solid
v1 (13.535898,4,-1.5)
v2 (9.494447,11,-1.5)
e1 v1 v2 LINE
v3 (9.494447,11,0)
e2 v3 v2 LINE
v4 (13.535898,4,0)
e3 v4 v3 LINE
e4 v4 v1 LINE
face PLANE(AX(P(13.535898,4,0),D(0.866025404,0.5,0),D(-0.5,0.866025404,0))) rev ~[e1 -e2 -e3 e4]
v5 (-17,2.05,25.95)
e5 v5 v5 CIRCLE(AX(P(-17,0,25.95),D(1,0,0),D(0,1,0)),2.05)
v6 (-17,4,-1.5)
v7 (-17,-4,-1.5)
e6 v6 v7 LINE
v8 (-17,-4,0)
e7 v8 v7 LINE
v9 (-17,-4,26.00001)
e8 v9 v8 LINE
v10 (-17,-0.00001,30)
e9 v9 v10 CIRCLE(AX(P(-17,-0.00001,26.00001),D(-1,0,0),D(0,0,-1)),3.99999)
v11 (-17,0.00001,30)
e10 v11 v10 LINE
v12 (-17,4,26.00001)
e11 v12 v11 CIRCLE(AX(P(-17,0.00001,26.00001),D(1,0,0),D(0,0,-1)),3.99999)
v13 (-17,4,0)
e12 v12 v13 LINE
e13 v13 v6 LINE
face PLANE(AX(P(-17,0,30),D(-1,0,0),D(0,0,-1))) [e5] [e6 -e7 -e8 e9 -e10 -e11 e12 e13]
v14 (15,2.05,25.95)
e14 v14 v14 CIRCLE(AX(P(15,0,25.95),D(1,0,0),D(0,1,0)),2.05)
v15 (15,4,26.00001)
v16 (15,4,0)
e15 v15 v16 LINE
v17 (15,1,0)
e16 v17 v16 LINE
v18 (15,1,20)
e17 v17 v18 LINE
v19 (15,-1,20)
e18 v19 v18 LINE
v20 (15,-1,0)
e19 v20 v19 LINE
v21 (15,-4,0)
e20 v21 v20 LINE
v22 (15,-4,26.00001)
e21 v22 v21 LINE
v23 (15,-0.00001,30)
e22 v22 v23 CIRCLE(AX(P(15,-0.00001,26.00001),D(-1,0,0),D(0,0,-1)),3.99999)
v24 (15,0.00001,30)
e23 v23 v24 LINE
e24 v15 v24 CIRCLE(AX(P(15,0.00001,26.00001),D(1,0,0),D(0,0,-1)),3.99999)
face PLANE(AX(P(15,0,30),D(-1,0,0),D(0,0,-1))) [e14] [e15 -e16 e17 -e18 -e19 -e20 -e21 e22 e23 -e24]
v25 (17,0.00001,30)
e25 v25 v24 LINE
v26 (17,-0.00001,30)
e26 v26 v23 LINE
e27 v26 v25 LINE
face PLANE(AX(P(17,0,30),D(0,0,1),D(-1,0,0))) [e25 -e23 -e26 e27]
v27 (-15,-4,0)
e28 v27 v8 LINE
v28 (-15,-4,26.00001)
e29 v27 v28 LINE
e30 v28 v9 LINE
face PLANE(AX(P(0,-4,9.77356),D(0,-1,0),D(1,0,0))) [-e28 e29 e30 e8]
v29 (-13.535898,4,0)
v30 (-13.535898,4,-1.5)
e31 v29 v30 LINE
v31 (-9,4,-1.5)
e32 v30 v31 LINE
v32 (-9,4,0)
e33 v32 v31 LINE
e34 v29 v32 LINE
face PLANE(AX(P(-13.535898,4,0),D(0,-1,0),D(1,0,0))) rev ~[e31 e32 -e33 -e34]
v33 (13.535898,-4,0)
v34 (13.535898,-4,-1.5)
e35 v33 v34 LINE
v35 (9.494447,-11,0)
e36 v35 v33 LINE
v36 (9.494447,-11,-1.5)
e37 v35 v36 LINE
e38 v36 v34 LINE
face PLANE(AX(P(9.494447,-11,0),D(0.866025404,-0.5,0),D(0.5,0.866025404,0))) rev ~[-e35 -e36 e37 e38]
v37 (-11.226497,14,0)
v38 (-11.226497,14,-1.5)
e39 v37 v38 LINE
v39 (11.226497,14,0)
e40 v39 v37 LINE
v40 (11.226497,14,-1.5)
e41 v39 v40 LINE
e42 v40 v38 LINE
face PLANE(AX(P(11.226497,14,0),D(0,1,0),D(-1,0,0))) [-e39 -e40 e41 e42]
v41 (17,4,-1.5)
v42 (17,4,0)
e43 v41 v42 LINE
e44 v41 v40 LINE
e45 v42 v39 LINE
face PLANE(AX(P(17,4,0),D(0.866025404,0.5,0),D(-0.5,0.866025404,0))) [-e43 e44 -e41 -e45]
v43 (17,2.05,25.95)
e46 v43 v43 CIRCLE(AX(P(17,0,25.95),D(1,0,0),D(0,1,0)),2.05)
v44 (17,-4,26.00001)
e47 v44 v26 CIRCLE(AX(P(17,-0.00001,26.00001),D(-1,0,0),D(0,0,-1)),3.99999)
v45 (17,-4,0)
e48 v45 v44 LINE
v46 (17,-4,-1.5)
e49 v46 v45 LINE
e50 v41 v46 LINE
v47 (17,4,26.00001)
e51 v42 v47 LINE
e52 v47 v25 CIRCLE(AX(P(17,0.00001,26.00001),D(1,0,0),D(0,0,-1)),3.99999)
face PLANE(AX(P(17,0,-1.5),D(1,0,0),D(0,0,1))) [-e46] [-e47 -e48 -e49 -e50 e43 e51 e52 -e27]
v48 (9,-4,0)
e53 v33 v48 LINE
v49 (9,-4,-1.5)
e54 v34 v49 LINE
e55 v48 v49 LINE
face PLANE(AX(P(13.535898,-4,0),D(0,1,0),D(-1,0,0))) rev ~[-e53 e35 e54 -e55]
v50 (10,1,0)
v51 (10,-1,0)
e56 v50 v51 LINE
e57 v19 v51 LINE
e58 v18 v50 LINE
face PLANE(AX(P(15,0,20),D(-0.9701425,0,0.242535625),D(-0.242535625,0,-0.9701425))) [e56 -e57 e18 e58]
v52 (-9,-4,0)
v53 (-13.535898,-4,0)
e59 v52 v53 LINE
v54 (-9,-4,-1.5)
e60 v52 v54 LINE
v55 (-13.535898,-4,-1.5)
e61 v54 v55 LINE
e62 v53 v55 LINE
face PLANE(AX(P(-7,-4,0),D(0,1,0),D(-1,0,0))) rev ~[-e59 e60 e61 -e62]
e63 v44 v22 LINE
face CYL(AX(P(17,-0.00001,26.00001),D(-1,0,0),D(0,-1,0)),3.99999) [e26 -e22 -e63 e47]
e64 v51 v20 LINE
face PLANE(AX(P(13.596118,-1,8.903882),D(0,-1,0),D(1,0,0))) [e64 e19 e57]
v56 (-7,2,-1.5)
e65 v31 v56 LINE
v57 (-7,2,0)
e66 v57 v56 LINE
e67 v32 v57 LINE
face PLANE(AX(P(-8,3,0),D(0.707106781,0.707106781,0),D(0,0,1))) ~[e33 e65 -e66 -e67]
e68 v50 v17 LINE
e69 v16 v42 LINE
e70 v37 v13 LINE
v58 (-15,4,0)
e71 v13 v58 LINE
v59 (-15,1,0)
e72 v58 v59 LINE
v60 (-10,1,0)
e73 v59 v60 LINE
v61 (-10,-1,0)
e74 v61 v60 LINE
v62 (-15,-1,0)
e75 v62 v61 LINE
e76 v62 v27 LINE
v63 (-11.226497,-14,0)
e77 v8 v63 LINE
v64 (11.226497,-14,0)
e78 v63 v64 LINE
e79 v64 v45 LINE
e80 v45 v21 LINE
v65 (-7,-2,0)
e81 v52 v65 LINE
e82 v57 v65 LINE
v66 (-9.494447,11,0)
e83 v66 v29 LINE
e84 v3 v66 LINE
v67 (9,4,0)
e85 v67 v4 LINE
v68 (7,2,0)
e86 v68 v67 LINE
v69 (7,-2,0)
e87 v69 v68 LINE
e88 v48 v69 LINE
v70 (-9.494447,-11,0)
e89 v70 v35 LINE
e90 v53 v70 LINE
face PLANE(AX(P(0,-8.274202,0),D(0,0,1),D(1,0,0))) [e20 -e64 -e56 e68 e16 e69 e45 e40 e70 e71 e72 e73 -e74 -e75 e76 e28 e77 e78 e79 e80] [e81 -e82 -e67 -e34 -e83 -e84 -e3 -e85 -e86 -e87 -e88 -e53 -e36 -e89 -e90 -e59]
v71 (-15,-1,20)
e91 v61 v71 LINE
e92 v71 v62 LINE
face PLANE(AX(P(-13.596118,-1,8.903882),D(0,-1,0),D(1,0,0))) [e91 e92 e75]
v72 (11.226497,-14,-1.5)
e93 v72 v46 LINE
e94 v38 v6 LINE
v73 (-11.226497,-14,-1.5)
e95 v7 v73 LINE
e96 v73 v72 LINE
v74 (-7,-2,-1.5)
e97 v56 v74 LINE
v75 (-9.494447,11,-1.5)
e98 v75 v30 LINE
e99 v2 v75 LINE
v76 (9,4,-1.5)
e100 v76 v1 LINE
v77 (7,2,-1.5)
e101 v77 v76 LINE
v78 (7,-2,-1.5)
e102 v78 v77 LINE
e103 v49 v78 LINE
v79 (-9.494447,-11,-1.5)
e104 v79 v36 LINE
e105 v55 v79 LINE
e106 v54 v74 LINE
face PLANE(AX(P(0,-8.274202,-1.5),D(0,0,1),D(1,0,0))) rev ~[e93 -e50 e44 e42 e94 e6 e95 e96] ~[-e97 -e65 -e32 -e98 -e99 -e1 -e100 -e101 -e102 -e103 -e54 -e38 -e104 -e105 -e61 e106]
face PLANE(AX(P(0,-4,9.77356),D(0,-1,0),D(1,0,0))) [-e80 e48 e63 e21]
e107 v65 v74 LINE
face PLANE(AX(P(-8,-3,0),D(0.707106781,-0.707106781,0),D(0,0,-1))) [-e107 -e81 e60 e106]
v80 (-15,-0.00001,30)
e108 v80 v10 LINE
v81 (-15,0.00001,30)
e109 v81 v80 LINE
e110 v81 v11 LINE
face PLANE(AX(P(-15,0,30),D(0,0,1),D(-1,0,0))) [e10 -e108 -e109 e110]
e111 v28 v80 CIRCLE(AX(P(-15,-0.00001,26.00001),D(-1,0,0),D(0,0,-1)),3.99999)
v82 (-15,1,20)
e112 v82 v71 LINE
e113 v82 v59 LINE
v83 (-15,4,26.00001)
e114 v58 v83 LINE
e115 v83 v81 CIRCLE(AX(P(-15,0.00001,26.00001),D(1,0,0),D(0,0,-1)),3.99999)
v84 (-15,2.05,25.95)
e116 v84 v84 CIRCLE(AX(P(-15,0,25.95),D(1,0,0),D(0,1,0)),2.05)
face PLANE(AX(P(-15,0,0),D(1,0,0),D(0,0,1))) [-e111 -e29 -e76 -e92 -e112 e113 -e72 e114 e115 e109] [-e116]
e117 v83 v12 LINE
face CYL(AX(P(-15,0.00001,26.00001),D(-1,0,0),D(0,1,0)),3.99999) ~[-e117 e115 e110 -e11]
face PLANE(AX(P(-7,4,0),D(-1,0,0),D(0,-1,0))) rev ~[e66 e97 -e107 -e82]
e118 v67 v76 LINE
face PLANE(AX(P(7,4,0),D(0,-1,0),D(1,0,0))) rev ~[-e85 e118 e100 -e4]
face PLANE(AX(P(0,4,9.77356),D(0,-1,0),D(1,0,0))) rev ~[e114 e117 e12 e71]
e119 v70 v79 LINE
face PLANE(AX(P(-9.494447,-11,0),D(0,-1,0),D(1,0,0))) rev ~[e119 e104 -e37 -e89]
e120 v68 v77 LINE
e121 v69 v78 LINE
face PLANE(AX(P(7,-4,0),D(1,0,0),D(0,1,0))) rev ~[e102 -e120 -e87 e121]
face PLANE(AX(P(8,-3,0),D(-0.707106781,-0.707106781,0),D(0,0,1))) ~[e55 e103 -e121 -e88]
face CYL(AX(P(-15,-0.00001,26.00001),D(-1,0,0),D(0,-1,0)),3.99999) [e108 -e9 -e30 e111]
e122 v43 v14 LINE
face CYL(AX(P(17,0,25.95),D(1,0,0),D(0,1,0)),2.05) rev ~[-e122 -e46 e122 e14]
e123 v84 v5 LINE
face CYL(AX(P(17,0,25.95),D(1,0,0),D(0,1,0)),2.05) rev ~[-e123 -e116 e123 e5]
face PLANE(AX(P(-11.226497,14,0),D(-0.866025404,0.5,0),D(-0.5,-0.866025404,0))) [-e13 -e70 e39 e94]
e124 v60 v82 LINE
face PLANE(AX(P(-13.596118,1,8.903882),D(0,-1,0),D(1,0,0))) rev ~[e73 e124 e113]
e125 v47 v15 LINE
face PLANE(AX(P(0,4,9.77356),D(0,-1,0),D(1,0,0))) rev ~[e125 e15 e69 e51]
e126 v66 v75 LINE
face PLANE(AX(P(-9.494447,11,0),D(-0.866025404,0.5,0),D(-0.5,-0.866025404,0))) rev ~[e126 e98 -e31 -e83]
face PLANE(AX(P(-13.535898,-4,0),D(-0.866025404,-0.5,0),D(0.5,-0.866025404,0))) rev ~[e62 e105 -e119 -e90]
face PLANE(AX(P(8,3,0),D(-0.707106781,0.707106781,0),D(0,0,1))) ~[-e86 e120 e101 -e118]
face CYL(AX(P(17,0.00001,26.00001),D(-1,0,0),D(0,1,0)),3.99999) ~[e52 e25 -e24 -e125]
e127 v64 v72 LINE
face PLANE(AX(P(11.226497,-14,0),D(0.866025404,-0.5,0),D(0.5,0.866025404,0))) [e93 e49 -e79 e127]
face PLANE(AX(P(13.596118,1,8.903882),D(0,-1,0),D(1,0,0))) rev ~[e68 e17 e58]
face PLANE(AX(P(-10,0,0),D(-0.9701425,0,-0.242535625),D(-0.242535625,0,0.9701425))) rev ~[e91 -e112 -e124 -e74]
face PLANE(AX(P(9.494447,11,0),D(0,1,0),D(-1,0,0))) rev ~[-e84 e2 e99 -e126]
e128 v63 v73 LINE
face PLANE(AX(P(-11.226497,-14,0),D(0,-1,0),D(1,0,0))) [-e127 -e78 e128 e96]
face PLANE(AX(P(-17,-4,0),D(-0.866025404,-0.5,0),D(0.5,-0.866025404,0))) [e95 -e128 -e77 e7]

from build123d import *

# Parameters (mm, degrees)
F1_DEPTH = 4
F2_R     = 2.05
F3_DEPTH = 34.001
F5_DEPTH = 1
F7_DEPTH = 1.5
F9_DEPTH = 1.501
F10_SIZE = 2
F11_R    = 3.99999


# Not quite as in the source:
# - a fillet or chamfer is up to 0.001 mm smaller than in the source, because OpenCascade refuses the exact size


with BuildPart() as f1:
    # F0 (on Front) → F1 (new body, symmetric)
    with BuildSketch(Plane.XZ):
        Polygon((15, 0), (0, 0), (-15, 0), (-15, 30), (-17, 30), (-17, -1.5), (0, -1.5), (17, -1.5), (17, 30), (15, 30), align=None)
    extrude(amount=F1_DEPTH, both=True)

    # F2 (on face) → F3 (cut, through all)
    with BuildSketch(Plane.YZ.offset(17)):
        with Locations((0, 25.95)):
            Circle(F2_R)
    extrude(amount=-F3_DEPTH, mode=Mode.SUBTRACT)

    # F4 (on Front) → F5 (join, symmetric)
    with BuildSketch(Plane.XZ):
        Polygon((-10, 0), (-15, 20), (-15, 0), align=None)
        Polygon((15, 20), (10, 0), (15, 0), align=None)
    extrude(amount=F5_DEPTH, both=True)

    # F6 (on face) → F7 (join, through all)
    with BuildSketch(Plane.XY):
        Polygon((15, -4), (-15, -4), (-17, -4), (-11.2264973081, -14), (0, -14), (11.2264973081, -14), (17, -4), align=None)
        Polygon((-11.2264973081, 14), (-17, 4), (-15, 4), (15, 4), (17, 4), (11.2264973081, 14), (0, 14), align=None)
    extrude(amount=-F7_DEPTH)

    # F8 (on face) → F9 (cut, through all)
    with BuildSketch(Plane.XY):
        Polygon((-7, -4), (-13.5358983849, -4), (-9.4944465005, -11), (9.4944465005, -11), (13.5358983849, -4), (7, -4), (7, 4), (13.5358983849, 4), (9.4944465005, 11), (-9.4944465005, 11), (-13.5358983849, 4), (-7, 4), align=None)
    extrude(amount=-F9_DEPTH, mode=Mode.SUBTRACT)

    # F10
    f10_edges = [f1.edges().sort_by_distance(p)[0] for p in [
        (-7, -4, -0.75),
        (-7, 4, -0.75),
        (7, -4, -0.75),
        (7, 4, -0.75),
    ]]
    chamfer(f10_edges, length=F10_SIZE)

    # F11 (radius 4 in the source; OpenCascade refuses exactly that, so slightly less here)
    f11_edges = [f1.edges().sort_by_distance(p)[0] for p in [
        (-16, -4, 30),
        (16, -4, 30),
        (16, 4, 30),
        (-16, 4, 30),
    ]]
    fillet(f11_edges, radius=F11_R)


solid = f1.part
